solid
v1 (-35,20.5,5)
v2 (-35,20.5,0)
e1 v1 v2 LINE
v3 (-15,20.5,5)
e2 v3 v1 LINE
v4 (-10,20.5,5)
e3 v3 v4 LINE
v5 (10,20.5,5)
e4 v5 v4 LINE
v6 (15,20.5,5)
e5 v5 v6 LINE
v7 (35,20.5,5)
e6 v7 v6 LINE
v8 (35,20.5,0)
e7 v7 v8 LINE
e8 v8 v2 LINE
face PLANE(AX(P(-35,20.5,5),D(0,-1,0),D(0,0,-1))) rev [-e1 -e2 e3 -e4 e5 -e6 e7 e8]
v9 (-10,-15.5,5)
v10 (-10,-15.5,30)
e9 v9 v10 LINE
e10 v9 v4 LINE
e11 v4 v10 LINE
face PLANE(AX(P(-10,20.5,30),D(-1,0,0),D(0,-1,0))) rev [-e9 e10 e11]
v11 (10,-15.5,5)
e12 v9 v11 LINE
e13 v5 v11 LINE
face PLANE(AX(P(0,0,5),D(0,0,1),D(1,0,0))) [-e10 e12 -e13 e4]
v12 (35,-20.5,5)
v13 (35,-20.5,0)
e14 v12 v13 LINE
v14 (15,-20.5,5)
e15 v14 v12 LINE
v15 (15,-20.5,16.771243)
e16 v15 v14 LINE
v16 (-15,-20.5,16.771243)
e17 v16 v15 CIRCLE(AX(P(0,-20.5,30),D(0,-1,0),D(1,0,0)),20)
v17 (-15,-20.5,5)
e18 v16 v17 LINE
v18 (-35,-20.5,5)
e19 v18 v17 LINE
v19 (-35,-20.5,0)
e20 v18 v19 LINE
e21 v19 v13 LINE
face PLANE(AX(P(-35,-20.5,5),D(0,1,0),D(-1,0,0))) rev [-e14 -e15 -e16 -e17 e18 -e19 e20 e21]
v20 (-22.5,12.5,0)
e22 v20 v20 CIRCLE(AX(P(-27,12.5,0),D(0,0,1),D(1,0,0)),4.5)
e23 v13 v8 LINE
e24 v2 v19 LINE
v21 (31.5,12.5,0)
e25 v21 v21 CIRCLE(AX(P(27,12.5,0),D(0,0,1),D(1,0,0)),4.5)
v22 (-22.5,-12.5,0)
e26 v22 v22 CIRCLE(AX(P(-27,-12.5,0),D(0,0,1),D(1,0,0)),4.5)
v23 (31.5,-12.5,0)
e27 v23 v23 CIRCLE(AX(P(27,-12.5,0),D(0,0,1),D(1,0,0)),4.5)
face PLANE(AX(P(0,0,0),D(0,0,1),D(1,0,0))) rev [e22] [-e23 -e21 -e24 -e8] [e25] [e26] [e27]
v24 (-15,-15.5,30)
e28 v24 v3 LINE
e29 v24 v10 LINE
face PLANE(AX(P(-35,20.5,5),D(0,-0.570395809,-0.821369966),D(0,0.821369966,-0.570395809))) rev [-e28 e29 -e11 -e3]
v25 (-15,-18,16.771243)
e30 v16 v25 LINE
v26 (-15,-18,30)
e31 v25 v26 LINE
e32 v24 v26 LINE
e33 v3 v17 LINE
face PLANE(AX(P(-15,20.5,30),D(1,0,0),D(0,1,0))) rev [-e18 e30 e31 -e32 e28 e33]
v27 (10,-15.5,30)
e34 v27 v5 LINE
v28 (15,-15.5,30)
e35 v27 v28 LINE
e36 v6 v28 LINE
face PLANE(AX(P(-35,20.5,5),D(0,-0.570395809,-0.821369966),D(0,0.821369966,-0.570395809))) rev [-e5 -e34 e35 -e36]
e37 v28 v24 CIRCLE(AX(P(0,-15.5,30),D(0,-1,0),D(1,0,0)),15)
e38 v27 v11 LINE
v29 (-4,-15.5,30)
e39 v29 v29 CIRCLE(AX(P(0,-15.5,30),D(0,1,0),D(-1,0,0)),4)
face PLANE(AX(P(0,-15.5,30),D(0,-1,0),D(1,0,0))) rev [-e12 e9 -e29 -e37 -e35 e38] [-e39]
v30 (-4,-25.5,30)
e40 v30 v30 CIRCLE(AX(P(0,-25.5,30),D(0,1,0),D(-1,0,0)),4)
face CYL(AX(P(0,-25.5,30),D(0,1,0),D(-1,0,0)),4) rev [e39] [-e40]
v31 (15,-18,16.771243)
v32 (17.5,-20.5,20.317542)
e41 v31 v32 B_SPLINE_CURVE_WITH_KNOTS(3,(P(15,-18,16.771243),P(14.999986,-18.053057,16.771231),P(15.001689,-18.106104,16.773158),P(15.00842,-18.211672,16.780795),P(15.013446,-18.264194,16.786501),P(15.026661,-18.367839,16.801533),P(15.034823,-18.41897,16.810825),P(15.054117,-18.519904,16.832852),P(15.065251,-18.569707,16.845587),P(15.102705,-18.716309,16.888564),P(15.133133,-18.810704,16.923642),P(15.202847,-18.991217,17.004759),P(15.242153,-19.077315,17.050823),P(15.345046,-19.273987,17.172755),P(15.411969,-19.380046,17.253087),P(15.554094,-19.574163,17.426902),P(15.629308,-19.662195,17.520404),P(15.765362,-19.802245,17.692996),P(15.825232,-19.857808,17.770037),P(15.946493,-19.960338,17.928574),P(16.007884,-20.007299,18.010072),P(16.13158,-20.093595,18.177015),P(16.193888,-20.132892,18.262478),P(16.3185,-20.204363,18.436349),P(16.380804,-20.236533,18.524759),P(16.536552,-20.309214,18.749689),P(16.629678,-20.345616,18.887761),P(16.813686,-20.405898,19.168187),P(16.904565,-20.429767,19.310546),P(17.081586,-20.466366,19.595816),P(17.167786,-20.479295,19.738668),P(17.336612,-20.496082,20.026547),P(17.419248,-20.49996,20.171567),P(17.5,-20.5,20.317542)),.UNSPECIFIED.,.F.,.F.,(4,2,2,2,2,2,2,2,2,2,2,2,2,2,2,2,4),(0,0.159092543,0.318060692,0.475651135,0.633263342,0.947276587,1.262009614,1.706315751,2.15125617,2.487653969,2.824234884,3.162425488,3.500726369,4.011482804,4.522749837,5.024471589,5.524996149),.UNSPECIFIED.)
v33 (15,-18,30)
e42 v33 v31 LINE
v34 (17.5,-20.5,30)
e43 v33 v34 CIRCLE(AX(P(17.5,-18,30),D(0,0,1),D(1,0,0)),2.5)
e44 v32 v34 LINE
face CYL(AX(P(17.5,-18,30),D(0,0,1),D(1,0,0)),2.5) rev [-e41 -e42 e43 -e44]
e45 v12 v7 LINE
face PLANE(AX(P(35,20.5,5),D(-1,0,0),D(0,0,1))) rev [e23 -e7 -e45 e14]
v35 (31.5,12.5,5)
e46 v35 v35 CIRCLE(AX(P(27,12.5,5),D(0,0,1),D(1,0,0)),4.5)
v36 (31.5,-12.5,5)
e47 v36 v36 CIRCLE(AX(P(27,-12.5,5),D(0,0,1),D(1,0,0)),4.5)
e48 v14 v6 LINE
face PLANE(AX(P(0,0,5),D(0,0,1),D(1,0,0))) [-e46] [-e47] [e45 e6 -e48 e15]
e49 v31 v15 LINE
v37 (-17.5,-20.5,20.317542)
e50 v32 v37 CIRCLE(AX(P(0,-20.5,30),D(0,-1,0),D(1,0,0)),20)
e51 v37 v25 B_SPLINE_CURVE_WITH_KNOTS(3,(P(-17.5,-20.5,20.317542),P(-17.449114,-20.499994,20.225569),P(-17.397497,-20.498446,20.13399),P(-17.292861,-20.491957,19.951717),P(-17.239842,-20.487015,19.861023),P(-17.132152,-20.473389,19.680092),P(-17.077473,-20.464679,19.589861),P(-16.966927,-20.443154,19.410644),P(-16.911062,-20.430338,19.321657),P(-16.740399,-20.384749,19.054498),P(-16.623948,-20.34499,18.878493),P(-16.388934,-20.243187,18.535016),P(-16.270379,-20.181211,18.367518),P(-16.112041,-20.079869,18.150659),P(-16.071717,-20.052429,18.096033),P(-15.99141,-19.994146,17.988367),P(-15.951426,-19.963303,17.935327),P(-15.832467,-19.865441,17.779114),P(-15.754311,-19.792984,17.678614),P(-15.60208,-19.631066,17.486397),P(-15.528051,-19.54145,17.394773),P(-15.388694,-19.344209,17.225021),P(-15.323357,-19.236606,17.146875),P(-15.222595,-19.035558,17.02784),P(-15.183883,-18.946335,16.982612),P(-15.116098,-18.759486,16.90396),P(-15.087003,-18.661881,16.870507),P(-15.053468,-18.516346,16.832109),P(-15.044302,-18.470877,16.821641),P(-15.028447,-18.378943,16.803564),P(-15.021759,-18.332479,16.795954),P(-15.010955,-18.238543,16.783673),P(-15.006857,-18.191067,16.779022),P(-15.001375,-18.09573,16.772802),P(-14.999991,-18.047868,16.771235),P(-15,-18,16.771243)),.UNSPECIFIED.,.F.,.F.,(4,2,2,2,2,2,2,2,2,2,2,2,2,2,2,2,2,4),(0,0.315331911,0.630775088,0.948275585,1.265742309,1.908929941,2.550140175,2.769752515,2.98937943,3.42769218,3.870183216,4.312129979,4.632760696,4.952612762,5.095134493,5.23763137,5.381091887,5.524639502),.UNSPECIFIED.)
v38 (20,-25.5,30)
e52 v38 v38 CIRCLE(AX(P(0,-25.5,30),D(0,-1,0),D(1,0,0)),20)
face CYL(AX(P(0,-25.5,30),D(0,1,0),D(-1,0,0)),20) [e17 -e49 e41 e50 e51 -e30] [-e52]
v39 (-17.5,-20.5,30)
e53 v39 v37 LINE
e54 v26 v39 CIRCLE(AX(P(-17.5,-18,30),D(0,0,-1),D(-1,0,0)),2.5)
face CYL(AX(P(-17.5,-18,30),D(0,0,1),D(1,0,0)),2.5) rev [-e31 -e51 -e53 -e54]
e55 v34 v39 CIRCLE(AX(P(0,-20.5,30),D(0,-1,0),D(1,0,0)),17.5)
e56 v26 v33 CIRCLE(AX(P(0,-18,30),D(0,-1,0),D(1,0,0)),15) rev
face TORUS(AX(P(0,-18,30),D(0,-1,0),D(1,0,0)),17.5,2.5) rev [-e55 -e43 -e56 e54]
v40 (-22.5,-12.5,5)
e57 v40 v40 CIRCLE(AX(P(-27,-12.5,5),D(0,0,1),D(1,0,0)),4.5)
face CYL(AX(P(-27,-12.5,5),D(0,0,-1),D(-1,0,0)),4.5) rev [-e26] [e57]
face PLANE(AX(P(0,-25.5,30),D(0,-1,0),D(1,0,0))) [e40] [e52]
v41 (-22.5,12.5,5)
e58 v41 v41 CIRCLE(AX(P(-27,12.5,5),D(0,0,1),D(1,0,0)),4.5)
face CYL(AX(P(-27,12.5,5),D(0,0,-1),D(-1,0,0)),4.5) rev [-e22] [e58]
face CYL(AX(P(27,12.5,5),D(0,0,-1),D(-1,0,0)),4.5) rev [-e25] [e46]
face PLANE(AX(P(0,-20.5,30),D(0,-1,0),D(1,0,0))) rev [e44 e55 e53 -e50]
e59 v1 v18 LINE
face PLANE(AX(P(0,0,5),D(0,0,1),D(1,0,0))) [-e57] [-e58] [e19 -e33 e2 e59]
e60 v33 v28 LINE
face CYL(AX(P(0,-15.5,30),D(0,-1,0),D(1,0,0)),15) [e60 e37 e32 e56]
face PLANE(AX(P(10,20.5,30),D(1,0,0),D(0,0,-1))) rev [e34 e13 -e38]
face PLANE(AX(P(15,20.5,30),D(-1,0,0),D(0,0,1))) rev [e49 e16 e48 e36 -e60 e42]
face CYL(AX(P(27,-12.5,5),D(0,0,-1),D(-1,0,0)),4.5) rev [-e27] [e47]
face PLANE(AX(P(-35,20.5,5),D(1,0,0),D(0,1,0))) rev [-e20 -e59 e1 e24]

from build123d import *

# Parameters (mm, degrees)
SKETCH1_W               = 70
SKETCH1_H               = 41
SKETCH1_R               = 4.5
BOSS_EXTRUDE1_DEPTH     = 5
SKETCH2_W               = 5
SKETCH2_H               = 41
BOSS_EXTRUDE2_DEPTH     = 25
BOSS_EXTRUDE3_DEPTH     = 5
CUT_EXTRUDE2_DEPTH      = 61.582588258
CUT_EXTRUDE2_DEPTH_BACK = 61.582588258
SKETCH6_R               = 20
BOSS_EXTRUDE4_DEPTH     = 5
SKETCH7_R               = 4
CUT_EXTRUDE3_DEPTH      = 71.859014952
FILLET1_R               = 2.5


with BuildPart() as part:
    # Sketch1 → Boss-Extrude1 (new body)
    with BuildSketch(Plane.XY):
        Rectangle(SKETCH1_W, SKETCH1_H)
        with Locations((-27, 12.5)):
            Circle(SKETCH1_R, mode=Mode.SUBTRACT)
        with Locations((-27, -12.5)):
            Circle(SKETCH1_R, mode=Mode.SUBTRACT)
        with Locations((27, 12.5)):
            Circle(SKETCH1_R, mode=Mode.SUBTRACT)
        with Locations((27, -12.5)):
            Circle(SKETCH1_R, mode=Mode.SUBTRACT)
    extrude(amount=BOSS_EXTRUDE1_DEPTH)

    # Sketch2 → Boss-Extrude2 (add)
    with BuildSketch(Plane.XY.offset(5)):
        with Locations((-12.5, 0)):
            Rectangle(SKETCH2_W, SKETCH2_H)
        with Locations((12.5, 0)):
            Rectangle(SKETCH2_W, SKETCH2_H)
    extrude(amount=BOSS_EXTRUDE2_DEPTH)

    # Sketch5 → Boss-Extrude3 (add)
    with BuildSketch(Plane.XZ.offset(20.5)):
        with BuildLine():
            Line((-15, 30), (-15, 5))
            Line((-15, 5), (15, 5))
            Line((15, 5), (15, 30))
            ThreePointArc((15, 30), (0, 45), (-15, 30))
        make_face()
    extrude(amount=-BOSS_EXTRUDE3_DEPTH)

    # Sketch3 → Cut-Extrude2 (cut, two sides: drawn at the far end of the back side and taken through both)
    with BuildSketch(Plane(origin=(0, 0, 0), x_dir=(0, 0, -1), z_dir=(1, 0, 0)).offset(-CUT_EXTRUDE2_DEPTH_BACK)):
        Polygon((-5, 20.5), (-30, -15.5), (-49.542972481, -15.5), (-49.542972481, 23.944363396), (-5, 23.944363396), align=None)
    extrude(amount=CUT_EXTRUDE2_DEPTH + CUT_EXTRUDE2_DEPTH_BACK, mode=Mode.SUBTRACT)

    # Sketch6 → Boss-Extrude4 (add)
    with BuildSketch(Plane.XZ.offset(20.5)):
        with Locations(Location((0, 30, 0), (0, 0, 221.409622109))):
            Circle(SKETCH6_R)
    extrude(amount=BOSS_EXTRUDE4_DEPTH)

    # Sketch7 → Cut-Extrude3 (cut, through all)
    with BuildSketch(Plane(origin=(0, -15.5, 0), x_dir=(1, 0, 0), z_dir=(0, 1, 0))):
        with Locations(Location((0, -30, 0), (0, 0, 180))):
            Circle(SKETCH7_R)
    extrude(amount=-CUT_EXTRUDE3_DEPTH, mode=Mode.SUBTRACT)

    # Fillet1
    # the kernel refuses this fillet: 2.5 mm, written as the material it adds along each edge
    with BuildSketch(Plane(origin=(-15, -20.5, 10.521243445), x_dir=(0, 1, 0), z_dir=(0, 0, 1))) as fillet1_piece_1_section:
        with BuildLine():
            CenterArc((FILLET1_R, FILLET1_R), FILLET1_R, 180, 90)
            Line((0, FILLET1_R), (0, 0))
            Line((0, 0), (FILLET1_R, 0))
        make_face()
    fillet1_piece_1 = extrude(amount=19.478756555, mode=Mode.PRIVATE)
    fillet1_piece_1 = fillet1_piece_1 & Plane(origin=(0, -19.928453247, 30), x_dir=(-0.7500000000031269, 0, -0.6614378277626021), z_dir=(0, 1, 0)) * Cylinder(20, 49, mode=Mode.PRIVATE)
    add(fillet1_piece_1)
    with BuildSketch(Plane(origin=(15, -20.5, 10.521243445), x_dir=(0, 1, 0), z_dir=(0, 0, 1))) as fillet1_piece_2_section:
        with BuildLine():
            CenterArc((FILLET1_R, -FILLET1_R), FILLET1_R, 90, 90)
            Line((0, -FILLET1_R), (0, 0))
            Line((0, 0), (FILLET1_R, 0))
        make_face()
    fillet1_piece_2 = extrude(amount=19.478756555, mode=Mode.PRIVATE)
    fillet1_piece_2 = fillet1_piece_2 & Plane(origin=(0, -19.928453234, 30), x_dir=(-0.7500000000031269, 0, -0.6614378277626021), z_dir=(0, 1, 0)) * Cylinder(20, 49, mode=Mode.PRIVATE)
    add(fillet1_piece_2)
    with BuildSketch(Plane(origin=(0, -20.5, 30), x_dir=(1, 0, 0), z_dir=(0, 0, -1))) as fillet1_piece_3:
        with BuildLine():
            CenterArc((15 + FILLET1_R, -FILLET1_R), FILLET1_R, 90, 90)
            Line((15, -FILLET1_R), (15, 0))
            Line((15, 0), (15 + FILLET1_R, 0))
        make_face()
    revolve(axis=Axis((0, -20.5, 30), (0, -1, 0)), revolution_arc=180)


solid = part.part
